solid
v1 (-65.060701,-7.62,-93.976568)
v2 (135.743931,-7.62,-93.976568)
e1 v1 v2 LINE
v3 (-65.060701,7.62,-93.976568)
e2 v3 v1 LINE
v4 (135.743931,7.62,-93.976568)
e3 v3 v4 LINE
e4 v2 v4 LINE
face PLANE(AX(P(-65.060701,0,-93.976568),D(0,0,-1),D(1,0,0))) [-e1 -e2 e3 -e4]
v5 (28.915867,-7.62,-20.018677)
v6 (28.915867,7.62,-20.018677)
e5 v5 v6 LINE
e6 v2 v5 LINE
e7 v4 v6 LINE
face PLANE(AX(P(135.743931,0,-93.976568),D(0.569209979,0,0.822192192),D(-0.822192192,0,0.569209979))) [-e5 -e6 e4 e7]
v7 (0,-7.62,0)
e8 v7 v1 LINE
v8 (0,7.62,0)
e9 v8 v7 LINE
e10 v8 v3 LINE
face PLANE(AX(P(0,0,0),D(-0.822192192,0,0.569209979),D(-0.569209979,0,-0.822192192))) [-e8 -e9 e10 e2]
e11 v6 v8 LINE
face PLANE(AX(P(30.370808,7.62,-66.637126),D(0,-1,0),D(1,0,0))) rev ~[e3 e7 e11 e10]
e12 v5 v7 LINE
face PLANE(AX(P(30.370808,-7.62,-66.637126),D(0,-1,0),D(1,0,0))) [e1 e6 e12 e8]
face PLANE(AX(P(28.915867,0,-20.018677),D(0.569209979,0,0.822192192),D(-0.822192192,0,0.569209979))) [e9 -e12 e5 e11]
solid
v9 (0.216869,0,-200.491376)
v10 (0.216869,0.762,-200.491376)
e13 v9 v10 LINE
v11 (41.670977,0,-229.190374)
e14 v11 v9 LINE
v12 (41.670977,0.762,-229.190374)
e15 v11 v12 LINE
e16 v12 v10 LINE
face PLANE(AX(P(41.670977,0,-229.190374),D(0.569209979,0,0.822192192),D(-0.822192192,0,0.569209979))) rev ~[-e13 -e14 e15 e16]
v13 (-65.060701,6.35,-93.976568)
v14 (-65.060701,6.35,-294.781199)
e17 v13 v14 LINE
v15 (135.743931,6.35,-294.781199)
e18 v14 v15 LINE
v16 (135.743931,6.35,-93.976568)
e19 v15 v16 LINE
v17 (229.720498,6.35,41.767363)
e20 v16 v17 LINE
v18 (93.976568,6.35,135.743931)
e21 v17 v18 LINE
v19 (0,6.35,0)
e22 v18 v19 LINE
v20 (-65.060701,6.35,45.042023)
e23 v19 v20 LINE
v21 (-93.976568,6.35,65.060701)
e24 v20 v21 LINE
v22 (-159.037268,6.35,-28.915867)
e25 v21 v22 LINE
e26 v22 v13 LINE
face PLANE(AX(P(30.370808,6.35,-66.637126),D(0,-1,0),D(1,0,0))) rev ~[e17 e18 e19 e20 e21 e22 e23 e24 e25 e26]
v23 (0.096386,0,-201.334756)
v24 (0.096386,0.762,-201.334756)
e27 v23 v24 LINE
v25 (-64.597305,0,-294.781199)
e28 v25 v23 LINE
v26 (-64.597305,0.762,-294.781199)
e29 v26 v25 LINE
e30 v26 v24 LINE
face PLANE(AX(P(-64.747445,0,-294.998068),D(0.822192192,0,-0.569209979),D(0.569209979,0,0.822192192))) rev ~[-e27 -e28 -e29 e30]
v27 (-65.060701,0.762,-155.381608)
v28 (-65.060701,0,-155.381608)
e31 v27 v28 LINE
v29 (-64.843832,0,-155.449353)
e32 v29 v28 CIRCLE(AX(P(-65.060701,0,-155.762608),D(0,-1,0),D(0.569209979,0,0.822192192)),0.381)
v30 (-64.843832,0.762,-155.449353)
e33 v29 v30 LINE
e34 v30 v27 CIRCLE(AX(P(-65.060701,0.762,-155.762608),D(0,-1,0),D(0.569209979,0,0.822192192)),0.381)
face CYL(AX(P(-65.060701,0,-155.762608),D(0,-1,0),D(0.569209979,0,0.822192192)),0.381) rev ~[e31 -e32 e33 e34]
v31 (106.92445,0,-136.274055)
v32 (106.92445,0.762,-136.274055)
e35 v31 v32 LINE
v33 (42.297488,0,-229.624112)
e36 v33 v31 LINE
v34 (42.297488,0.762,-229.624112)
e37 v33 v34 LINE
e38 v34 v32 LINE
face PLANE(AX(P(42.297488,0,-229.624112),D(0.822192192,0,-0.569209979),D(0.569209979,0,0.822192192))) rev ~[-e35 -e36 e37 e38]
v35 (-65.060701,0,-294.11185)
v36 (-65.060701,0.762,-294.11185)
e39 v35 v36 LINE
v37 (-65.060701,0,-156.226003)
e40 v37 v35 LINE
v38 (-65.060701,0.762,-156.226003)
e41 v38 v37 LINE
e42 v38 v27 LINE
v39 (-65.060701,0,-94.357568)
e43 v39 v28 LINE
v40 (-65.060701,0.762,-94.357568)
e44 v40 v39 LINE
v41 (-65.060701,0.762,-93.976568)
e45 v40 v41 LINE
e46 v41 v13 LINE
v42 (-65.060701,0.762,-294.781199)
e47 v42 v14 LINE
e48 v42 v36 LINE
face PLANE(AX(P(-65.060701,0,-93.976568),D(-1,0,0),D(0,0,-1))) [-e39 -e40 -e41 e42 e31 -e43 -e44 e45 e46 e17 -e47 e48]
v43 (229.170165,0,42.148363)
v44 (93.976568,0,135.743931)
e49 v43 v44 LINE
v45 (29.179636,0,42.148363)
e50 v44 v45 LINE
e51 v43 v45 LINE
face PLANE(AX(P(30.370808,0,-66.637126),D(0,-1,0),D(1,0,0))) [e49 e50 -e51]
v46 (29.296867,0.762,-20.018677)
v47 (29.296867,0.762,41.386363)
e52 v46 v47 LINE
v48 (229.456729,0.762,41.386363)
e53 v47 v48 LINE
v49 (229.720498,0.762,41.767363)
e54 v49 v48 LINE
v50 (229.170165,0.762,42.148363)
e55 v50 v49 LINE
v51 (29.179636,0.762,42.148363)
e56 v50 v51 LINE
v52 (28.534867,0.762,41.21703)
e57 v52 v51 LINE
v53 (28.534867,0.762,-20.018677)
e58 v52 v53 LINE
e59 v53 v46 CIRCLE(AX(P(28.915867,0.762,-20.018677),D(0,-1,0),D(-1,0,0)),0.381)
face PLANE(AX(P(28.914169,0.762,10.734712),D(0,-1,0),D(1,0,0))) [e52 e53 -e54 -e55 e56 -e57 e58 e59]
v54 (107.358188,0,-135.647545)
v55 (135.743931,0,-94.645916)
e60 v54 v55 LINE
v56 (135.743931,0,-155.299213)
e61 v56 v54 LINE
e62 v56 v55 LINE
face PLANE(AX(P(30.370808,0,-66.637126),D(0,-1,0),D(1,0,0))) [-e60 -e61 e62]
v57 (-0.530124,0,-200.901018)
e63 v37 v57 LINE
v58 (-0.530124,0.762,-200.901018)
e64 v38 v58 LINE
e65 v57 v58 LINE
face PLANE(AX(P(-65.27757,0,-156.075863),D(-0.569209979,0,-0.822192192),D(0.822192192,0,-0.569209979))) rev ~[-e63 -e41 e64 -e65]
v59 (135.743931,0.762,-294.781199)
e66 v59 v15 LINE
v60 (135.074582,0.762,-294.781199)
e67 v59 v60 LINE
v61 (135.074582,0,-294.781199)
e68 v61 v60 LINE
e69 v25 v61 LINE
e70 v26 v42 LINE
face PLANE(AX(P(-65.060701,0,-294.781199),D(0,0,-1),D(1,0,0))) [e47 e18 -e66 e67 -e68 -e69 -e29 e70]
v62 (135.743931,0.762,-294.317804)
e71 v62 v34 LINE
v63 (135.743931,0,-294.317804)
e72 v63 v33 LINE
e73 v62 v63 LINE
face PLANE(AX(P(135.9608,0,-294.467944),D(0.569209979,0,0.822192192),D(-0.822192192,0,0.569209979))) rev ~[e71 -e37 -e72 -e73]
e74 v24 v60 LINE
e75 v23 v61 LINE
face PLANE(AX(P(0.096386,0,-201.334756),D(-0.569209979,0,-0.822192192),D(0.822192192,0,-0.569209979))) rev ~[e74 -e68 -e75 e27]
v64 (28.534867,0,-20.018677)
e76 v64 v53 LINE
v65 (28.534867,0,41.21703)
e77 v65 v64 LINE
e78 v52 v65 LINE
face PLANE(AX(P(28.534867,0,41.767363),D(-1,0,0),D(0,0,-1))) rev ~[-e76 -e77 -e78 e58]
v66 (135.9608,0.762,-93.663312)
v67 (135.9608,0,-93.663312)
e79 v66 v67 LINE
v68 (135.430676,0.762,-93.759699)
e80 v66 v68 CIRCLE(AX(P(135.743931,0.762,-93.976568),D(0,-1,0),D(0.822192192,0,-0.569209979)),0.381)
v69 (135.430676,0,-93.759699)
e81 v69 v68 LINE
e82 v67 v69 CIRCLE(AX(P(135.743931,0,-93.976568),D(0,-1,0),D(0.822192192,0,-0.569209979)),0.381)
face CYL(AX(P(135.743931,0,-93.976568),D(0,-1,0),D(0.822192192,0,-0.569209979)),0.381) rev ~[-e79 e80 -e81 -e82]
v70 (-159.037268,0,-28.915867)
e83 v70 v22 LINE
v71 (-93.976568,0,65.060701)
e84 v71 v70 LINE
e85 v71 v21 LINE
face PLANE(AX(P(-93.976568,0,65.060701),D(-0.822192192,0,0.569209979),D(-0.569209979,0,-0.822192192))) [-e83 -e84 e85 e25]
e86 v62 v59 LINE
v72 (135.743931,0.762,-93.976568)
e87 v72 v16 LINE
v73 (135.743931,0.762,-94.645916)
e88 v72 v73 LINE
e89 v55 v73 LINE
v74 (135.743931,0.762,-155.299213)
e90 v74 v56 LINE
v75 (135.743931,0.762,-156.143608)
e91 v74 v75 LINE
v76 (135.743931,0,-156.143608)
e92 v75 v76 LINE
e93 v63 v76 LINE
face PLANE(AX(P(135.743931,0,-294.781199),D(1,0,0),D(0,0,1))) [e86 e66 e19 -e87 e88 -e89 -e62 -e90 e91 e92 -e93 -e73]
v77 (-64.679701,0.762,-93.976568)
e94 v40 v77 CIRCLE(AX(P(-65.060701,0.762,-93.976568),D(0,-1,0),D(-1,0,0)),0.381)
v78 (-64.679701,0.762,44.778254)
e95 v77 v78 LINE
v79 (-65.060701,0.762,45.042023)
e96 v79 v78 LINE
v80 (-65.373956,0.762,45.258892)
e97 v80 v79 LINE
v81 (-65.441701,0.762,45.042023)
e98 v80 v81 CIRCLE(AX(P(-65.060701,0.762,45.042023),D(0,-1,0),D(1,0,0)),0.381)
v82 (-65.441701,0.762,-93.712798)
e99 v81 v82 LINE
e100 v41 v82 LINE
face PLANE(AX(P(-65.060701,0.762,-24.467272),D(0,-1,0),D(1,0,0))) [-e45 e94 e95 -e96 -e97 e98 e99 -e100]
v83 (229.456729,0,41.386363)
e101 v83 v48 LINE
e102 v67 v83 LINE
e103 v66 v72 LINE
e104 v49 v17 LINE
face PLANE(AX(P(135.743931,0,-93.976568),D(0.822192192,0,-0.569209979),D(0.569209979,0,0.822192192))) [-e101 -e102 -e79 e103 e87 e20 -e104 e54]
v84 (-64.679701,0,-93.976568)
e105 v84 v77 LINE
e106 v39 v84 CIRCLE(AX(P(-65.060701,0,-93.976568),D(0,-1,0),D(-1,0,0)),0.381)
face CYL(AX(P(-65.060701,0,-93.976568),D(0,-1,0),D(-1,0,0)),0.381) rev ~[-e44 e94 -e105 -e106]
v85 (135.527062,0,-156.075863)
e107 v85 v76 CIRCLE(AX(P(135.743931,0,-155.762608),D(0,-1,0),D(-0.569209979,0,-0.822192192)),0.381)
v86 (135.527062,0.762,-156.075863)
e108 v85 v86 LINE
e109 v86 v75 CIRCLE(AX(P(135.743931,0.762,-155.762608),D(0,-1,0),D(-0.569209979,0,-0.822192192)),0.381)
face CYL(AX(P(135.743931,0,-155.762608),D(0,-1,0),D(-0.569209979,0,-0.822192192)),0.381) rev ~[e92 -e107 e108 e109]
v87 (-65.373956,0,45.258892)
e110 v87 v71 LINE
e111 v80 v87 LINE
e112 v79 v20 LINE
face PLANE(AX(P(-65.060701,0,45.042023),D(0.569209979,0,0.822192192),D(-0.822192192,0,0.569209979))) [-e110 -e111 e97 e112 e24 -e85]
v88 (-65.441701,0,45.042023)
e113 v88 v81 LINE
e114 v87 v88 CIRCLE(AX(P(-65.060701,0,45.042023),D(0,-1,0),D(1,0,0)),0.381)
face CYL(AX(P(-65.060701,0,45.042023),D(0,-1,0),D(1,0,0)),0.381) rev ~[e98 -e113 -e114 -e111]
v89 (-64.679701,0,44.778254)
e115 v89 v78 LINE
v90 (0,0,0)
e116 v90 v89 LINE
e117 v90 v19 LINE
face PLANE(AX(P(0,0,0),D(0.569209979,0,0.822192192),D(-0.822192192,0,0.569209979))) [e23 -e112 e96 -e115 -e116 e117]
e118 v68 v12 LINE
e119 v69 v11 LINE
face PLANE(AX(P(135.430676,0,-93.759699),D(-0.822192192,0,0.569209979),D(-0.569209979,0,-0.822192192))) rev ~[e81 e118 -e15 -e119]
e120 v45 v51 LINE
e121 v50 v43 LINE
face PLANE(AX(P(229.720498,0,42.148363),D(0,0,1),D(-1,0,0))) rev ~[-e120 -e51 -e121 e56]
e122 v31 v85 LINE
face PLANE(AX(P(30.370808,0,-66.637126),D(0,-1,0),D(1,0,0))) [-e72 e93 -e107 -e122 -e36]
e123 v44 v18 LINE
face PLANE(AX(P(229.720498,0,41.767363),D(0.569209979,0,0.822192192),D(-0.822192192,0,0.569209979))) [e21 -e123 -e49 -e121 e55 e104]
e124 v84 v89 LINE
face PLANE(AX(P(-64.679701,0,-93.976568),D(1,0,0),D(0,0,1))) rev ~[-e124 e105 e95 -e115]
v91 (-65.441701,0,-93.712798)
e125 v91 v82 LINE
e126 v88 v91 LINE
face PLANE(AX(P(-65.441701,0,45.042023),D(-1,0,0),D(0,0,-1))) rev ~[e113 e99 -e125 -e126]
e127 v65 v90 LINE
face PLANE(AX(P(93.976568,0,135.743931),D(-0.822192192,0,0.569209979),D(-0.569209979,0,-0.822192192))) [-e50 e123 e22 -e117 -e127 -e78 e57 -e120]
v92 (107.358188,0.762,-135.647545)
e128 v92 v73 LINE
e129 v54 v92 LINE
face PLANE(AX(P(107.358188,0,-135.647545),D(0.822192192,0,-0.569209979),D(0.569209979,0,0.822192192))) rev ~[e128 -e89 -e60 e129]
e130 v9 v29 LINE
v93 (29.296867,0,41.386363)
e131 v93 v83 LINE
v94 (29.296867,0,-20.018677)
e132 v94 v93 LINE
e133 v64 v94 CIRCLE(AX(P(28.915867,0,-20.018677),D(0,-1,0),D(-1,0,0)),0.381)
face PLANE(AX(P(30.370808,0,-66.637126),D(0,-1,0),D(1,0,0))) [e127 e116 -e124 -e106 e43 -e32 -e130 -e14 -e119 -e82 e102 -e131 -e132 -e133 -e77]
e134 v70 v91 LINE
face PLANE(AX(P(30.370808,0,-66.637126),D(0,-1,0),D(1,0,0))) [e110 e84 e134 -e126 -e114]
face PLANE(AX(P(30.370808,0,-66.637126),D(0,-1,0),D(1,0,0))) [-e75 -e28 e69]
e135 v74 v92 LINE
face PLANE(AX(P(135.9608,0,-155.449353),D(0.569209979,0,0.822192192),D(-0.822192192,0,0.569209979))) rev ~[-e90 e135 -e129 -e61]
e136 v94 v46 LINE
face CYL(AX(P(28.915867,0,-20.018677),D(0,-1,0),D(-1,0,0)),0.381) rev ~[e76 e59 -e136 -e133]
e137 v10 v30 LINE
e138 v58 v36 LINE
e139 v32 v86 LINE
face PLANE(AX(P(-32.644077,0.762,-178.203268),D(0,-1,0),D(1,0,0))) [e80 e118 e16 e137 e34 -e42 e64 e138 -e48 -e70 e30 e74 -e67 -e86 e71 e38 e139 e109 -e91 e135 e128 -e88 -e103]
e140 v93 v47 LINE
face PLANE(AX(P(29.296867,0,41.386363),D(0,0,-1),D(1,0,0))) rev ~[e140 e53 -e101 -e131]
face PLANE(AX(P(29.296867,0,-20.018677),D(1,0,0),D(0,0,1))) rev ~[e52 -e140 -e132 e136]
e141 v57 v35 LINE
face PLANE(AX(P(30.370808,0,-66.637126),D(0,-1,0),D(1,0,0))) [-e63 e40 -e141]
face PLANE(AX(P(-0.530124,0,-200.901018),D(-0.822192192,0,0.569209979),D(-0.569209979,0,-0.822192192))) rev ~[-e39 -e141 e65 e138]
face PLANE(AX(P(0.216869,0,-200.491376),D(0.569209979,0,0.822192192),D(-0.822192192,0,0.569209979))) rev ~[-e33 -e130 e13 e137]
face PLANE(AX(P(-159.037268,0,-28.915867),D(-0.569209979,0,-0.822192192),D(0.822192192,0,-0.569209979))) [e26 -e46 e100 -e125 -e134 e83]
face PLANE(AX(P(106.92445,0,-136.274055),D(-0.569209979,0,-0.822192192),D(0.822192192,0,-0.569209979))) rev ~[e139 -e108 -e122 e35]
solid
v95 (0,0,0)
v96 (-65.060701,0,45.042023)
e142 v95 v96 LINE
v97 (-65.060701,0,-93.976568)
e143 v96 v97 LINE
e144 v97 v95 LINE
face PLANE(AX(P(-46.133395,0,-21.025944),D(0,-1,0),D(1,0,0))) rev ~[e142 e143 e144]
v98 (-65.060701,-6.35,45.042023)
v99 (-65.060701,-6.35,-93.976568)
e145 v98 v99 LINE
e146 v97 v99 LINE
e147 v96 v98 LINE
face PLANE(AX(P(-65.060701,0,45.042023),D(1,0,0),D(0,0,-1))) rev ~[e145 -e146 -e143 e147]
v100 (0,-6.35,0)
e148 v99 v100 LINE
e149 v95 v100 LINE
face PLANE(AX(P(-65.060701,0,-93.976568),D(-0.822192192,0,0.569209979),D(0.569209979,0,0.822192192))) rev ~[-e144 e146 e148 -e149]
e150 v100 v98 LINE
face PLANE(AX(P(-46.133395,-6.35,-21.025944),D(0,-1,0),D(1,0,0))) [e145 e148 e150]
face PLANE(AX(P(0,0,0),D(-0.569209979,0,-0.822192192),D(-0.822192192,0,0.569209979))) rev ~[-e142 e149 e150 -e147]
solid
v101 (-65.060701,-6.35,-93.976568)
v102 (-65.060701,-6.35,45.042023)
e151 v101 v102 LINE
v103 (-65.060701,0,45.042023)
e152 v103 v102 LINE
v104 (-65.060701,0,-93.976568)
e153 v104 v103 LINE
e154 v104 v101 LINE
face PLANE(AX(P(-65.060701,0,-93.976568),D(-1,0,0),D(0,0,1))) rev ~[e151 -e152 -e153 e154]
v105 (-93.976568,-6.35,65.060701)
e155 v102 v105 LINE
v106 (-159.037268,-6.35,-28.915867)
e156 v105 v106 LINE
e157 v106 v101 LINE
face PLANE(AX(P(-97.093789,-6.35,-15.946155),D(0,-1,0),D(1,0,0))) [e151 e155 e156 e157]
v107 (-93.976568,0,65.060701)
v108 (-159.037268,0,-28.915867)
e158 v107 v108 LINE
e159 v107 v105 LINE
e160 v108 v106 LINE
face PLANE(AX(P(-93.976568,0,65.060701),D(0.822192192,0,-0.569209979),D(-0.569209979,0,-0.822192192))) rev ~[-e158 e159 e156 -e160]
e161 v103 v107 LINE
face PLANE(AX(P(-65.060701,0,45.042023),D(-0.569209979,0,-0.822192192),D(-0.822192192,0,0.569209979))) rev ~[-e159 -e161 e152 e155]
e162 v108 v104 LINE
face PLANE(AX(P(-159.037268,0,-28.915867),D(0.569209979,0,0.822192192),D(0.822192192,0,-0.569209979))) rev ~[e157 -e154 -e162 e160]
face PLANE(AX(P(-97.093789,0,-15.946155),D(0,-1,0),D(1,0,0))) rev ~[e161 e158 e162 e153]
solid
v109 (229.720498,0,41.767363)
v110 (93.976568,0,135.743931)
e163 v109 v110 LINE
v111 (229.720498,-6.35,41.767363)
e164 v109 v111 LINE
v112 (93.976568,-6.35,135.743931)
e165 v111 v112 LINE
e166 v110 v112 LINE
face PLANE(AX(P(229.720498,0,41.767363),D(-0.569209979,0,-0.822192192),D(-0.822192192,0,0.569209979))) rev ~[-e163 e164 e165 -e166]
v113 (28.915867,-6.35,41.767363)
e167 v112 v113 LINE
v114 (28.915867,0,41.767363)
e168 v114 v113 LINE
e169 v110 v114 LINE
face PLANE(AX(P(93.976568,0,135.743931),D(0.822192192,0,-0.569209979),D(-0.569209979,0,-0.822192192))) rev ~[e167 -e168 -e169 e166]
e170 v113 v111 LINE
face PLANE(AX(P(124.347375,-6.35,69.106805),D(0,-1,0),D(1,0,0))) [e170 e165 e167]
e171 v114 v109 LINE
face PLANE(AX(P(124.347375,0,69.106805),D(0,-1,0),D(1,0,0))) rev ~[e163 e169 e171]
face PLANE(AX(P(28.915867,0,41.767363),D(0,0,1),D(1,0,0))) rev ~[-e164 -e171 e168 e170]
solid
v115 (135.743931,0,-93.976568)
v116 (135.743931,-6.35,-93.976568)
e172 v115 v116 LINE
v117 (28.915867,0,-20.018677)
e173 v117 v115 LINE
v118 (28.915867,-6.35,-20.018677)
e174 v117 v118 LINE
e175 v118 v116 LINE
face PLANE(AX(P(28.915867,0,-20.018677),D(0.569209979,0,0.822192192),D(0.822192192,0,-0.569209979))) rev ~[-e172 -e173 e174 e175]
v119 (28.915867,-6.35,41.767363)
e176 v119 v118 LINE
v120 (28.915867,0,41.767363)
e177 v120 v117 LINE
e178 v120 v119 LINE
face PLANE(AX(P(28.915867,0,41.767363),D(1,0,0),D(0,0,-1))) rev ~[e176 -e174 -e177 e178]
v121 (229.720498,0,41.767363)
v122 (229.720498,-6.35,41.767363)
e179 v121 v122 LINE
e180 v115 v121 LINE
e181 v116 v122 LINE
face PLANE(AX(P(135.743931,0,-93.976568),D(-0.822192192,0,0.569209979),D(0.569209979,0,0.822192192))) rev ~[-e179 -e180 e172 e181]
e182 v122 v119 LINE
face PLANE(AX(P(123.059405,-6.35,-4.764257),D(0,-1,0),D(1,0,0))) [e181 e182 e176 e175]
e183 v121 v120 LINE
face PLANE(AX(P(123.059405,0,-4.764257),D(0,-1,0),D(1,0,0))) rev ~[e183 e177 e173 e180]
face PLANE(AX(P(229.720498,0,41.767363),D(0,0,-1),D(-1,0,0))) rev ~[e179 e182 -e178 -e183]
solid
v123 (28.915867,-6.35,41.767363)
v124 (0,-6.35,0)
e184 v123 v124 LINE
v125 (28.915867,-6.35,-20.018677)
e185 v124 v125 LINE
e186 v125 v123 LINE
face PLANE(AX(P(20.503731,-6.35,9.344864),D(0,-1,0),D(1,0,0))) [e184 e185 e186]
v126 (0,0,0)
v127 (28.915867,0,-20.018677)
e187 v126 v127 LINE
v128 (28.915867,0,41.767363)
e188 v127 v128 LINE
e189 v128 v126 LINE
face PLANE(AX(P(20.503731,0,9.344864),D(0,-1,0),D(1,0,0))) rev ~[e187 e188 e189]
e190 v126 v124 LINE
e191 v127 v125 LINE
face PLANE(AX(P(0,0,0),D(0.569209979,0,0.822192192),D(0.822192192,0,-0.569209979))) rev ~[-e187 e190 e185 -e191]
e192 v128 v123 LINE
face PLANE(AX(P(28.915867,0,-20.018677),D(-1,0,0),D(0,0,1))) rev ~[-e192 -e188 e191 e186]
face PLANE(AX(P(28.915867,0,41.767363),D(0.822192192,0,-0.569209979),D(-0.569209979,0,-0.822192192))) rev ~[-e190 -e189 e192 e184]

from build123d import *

# Parameters (mm, degrees)
F1_DEPTH = 7.62
F2_DEPTH = 6.35
F3_DEPTH = 6.35
F4_DEPTH = 6.35
F6_DEPTH = 0.762


with BuildPart() as f1:
    # F0 (on Front) → F1 (new body, symmetric)
    with BuildSketch(Plane.XZ):
        Polygon((28.9158669246, -20.0186771016), (0, 0), (-65.0607005803, -93.9765675049), (135.7439308404, -93.9765675049), align=None)
    extrude(amount=F1_DEPTH, both=True)


with BuildPart() as f2:
    # F0 (on Front) → F2 (new body)
    with BuildSketch(Plane.XZ):
        Polygon((28.9158669246, 41.7673633355), (28.9158669246, -20.0186771016), (135.7439308404, -93.9765675049), (229.7204983453, 41.7673633355), align=None)
    extrude(amount=F2_DEPTH)


with BuildPart() as f2b:
    # F0 (on Front) → F2, piece 2 (new body)
    with BuildSketch(Plane.XZ):
        Polygon((-65.0607005803, -93.9765675049), (0, 0), (-65.0607005803, 45.0420234787), align=None)
    extrude(amount=F2_DEPTH)


with BuildPart() as f3:
    # F0 (on Front) → F3 (new body)
    with BuildSketch(Plane.XZ):
        Polygon((93.9765675049, 135.7439308404), (28.9158669246, 41.7673633355), (229.7204983453, 41.7673633355), align=None)
    extrude(amount=F3_DEPTH)


with BuildPart() as f3b:
    # F0 (on Front) → F3, piece 2 (new body)
    with BuildSketch(Plane.XZ):
        Polygon((-159.0372680852, -28.9158669246), (-65.0607005803, -93.9765675049), (-65.0607005803, 45.0420234787), (-93.9765675049, 65.0607005803), align=None)
    extrude(amount=F3_DEPTH)


with BuildPart() as f3c:
    # F0 (on Front) → F3, piece 3 (new body)
    with BuildSketch(Plane.XZ):
        Polygon((28.9158669246, 41.7673633355), (0, 0), (28.9158669246, -20.0186771016), align=None)
    extrude(amount=F3_DEPTH)


with BuildPart() as f4:
    # F0 (on Front) → F4 (new body)
    with BuildSketch(Plane.XZ):
        Polygon((28.9158669246, -20.0186771016), (0, 0), (-65.0607005803, -93.9765675049), (135.7439308404, -93.9765675049), align=None)
        Polygon((28.9158669246, 41.7673633355), (0, 0), (28.9158669246, -20.0186771016), align=None)
        Polygon((-65.0607005803, -93.9765675049), (0, 0), (-65.0607005803, 45.0420234787), align=None)
        Polygon((135.7439308404, -93.9765675049), (-65.0607005803, -93.9765675049), (-65.0607005803, -155.762607942), (0, -200.8046314207), (41.7673633355, -229.7204983453), (106.8280639158, -135.7439308404), align=None)
        Polygon((-159.0372680852, -28.9158669246), (-65.0607005803, -93.9765675049), (-65.0607005803, 45.0420234787), (-93.9765675049, 65.0607005803), align=None)
        Polygon((28.9158669246, 41.7673633355), (28.9158669246, -20.0186771016), (135.7439308404, -93.9765675049), (229.7204983453, 41.7673633355), align=None)
        Polygon((93.9765675049, 135.7439308404), (28.9158669246, 41.7673633355), (229.7204983453, 41.7673633355), align=None)
        Polygon((135.7439308404, -155.762607942), (135.7439308404, -93.9765675049), (106.8280639158, -135.7439308404), align=None)
        Polygon((0, -200.8046314207), (-65.0607005803, -155.762607942), (-65.0607005803, -294.7811989256), align=None)
        Polygon((135.7439308404, -294.7811989256), (135.7439308404, -155.762607942), (106.8280639158, -135.7439308404), (41.7673633355, -229.7204983453), align=None)
        Polygon((0, -200.8046314207), (-65.0607005803, -294.7811989256), (135.7439308404, -294.7811989256), (41.7673633355, -229.7204983453), align=None)
    extrude(amount=-F4_DEPTH)

    # F5 (on face) → F6 (cut)
    with BuildSketch(Plane.XZ):
        with BuildLine():
            ThreePointArc((-64.8438315784, -155.449352717), (-65.3739558053, -155.5457389401), (-65.2775695822, -156.075863167))
            Line((-65.2775695822, -156.075863167), (-0.530124227, -200.9010176438))
            Line((-0.530124227, -200.9010176438), (-0.313255225, -200.5877624188))
            ThreePointArc((-0.313255225, -200.5877624188), (-0.0681555046, -200.4297770127), (0.2168687468, -200.491376019))
            Line((0.2168687468, -200.491376019), (-64.8438315784, -155.449352717))
        make_face()
        with BuildLine():
            Line((-0.313255225, -200.5877624188), (-0.530124227, -200.9010176438))
            Line((-0.530124227, -200.9010176438), (0.0963862231, -201.3347556476))
            Line((0.0963862231, -201.3347556476), (0.313255225, -201.0215004226))
            ThreePointArc((0.313255225, -201.0215004226), (0.374854408, -200.7364759161), (0.2168687468, -200.491376019))
            ThreePointArc((0.2168687468, -200.491376019), (-0.0681555046, -200.4297770127), (-0.313255225, -200.5877624188))
        make_face()
        with BuildLine():
            Line((0.0963862231, -201.3347556476), (-0.530124227, -200.9010176438))
            Line((-0.530124227, -200.9010176438), (-65.3739558053, -294.5643299236))
            ThreePointArc((-65.3739558053, -294.5643299236), (-65.2775695822, -295.0944541506), (-64.7474453553, -294.9980679275))
            Line((-64.7474453553, -294.9980679275), (0.0963862231, -201.3347556476))
        make_face()
        with BuildLine():
            Line((41.6709771124, -229.1903741183), (0.2168687468, -200.491376019))
            ThreePointArc((0.2168687468, -200.491376019), (0.374854408, -200.7364759161), (0.313255225, -201.0215004226))
            Line((0.313255225, -201.0215004226), (0.0963862231, -201.3347556476))
            Line((0.0963862231, -201.3347556476), (41.5504944163, -230.0337536275))
            ThreePointArc((41.5504944163, -230.0337536275), (41.3925089088, -229.7886537467), (41.4541081105, -229.5036293433))
            Line((41.4541081105, -229.5036293433), (41.6709771124, -229.1903741183))
        make_face()
        with BuildLine():
            Line((106.5148086859, -135.5270618455), (41.6709771124, -229.1903741183))
            Line((41.6709771124, -229.1903741183), (42.2974875625, -229.6241121222))
            Line((42.2974875625, -229.6241121222), (106.9244501389, -136.2740550673))
            Line((106.9244501389, -136.2740550673), (106.6111949139, -136.0571860654))
            ThreePointArc((106.6111949139, -136.0571860654), (106.4532094808, -135.8120861966), (106.5148086859, -135.5270618455))
        make_face()
        with BuildLine():
            Line((42.2974875625, -229.6241121222), (41.6709771124, -229.1903741183))
            Line((41.6709771124, -229.1903741183), (41.4541081105, -229.5036293433))
            ThreePointArc((41.4541081105, -229.5036293433), (41.3925089088, -229.7886537467), (41.5504944163, -230.0337536275))
            ThreePointArc((41.5504944163, -230.0337536275), (41.8355187369, -230.095352772), (42.0806185605, -229.9373673472))
            Line((42.0806185605, -229.9373673472), (42.2974875625, -229.6241121222))
        make_face()
        with BuildLine():
            ThreePointArc((42.0806185605, -229.9373673472), (41.8355187369, -230.095352772), (41.5504944163, -230.0337536275))
            Line((41.5504944163, -230.0337536275), (135.5270618385, -295.0944541506))
            ThreePointArc((135.5270618385, -295.0944541506), (136.0571860654, -294.9980679275), (135.9607998423, -294.4679437006))
            Line((135.9607998423, -294.4679437006), (42.2974875625, -229.6241121222))
            Line((42.2974875625, -229.6241121222), (42.0806185605, -229.9373673472))
        make_face()
        with BuildLine():
            ThreePointArc((107.0449329177, -135.4306756154), (106.7599085596, -135.3690764054), (106.5148086859, -135.5270618455))
            ThreePointArc((106.5148086859, -135.5270618455), (106.4532094808, -135.8120861966), (106.6111949139, -136.0571860654))
            Line((106.6111949139, -136.0571860654), (106.9244501389, -136.2740550673))
            Line((106.9244501389, -136.2740550673), (107.3581881428, -135.6475446173))
            Line((107.3581881428, -135.6475446173), (107.0449329177, -135.4306756154))
        make_face()
        with BuildLine():
            Line((135.4306756154, -93.7596985029), (106.5148086859, -135.5270618455))
            ThreePointArc((106.5148086859, -135.5270618455), (106.7599085596, -135.3690764054), (107.0449329177, -135.4306756154))
            Line((107.0449329177, -135.4306756154), (107.3581881428, -135.6475446173))
            Line((107.3581881428, -135.6475446173), (136.0571860654, -94.1934365068))
            ThreePointArc((136.0571860654, -94.1934365068), (135.9607998423, -93.6633122799), (135.4306756154, -93.7596985029))
        make_face()
        with BuildLine():
            Line((107.3581881428, -135.6475446173), (106.9244501389, -136.2740550673))
            Line((106.9244501389, -136.2740550673), (135.5270618385, -156.075863167))
            ThreePointArc((135.5270618385, -156.075863167), (136.0571860654, -155.979476944), (135.9607998423, -155.449352717))
            Line((135.9607998423, -155.449352717), (107.3581881428, -135.6475446173))
        make_face()
        with BuildLine():
            ThreePointArc((-65.4417005803, -93.9765675049), (-65.0607005803, -94.3575675049), (-64.6797005803, -93.9765675049))
            Line((-64.6797005803, -93.9765675049), (-64.6797005803, 45.0420234787))
            ThreePointArc((-64.6797005803, 45.0420234787), (-65.0607005803, 45.4230234787), (-65.4417005803, 45.0420234787))
            Line((-65.4417005803, 45.0420234787), (-65.4417005803, -93.9765675049))
        make_face()
        with BuildLine():
            ThreePointArc((28.9158669246, 41.3863633355), (28.6464592409, 41.4979556519), (28.5348669246, 41.7673633355))
            Line((28.5348669246, 41.7673633355), (28.5348669246, -20.0186771016))
            ThreePointArc((28.5348669246, -20.0186771016), (28.9158669246, -20.3996771016), (29.2968669246, -20.0186771016))
            Line((29.2968669246, -20.0186771016), (29.2968669246, 41.3863633355))
            Line((29.2968669246, 41.3863633355), (28.9158669246, 41.3863633355))
        make_face()
        with BuildLine():
            ThreePointArc((28.9158669246, 42.1483633355), (28.6464592409, 42.0367710191), (28.5348669246, 41.7673633355))
            ThreePointArc((28.5348669246, 41.7673633355), (28.6464592409, 41.4979556519), (28.9158669246, 41.3863633355))
            Line((28.9158669246, 41.3863633355), (29.2968669246, 41.3863633355))
            Line((29.2968669246, 41.3863633355), (29.2968669246, 41.7673633355))
            ThreePointArc((29.2968669246, 41.7673633355), (29.1852746082, 42.0367710191), (28.9158669246, 42.1483633355))
        make_face()
        with BuildLine():
            Line((229.7204983453, 42.1483633355), (28.9158669246, 42.1483633355))
            ThreePointArc((28.9158669246, 42.1483633355), (29.1852746082, 42.0367710191), (29.2968669246, 41.7673633355))
            Line((29.2968669246, 41.7673633355), (29.2968669246, 41.3863633355))
            Line((29.2968669246, 41.3863633355), (229.7204983453, 41.3863633355))
            ThreePointArc((229.7204983453, 41.3863633355), (230.1014983453, 41.7673633355), (229.7204983453, 42.1483633355))
        make_face()
    extrude(amount=-F6_DEPTH, mode=Mode.SUBTRACT)


solid = Compound([f1.part, f2.part, f2b.part, f3.part, f3b.part, f3c.part, f4.part])
